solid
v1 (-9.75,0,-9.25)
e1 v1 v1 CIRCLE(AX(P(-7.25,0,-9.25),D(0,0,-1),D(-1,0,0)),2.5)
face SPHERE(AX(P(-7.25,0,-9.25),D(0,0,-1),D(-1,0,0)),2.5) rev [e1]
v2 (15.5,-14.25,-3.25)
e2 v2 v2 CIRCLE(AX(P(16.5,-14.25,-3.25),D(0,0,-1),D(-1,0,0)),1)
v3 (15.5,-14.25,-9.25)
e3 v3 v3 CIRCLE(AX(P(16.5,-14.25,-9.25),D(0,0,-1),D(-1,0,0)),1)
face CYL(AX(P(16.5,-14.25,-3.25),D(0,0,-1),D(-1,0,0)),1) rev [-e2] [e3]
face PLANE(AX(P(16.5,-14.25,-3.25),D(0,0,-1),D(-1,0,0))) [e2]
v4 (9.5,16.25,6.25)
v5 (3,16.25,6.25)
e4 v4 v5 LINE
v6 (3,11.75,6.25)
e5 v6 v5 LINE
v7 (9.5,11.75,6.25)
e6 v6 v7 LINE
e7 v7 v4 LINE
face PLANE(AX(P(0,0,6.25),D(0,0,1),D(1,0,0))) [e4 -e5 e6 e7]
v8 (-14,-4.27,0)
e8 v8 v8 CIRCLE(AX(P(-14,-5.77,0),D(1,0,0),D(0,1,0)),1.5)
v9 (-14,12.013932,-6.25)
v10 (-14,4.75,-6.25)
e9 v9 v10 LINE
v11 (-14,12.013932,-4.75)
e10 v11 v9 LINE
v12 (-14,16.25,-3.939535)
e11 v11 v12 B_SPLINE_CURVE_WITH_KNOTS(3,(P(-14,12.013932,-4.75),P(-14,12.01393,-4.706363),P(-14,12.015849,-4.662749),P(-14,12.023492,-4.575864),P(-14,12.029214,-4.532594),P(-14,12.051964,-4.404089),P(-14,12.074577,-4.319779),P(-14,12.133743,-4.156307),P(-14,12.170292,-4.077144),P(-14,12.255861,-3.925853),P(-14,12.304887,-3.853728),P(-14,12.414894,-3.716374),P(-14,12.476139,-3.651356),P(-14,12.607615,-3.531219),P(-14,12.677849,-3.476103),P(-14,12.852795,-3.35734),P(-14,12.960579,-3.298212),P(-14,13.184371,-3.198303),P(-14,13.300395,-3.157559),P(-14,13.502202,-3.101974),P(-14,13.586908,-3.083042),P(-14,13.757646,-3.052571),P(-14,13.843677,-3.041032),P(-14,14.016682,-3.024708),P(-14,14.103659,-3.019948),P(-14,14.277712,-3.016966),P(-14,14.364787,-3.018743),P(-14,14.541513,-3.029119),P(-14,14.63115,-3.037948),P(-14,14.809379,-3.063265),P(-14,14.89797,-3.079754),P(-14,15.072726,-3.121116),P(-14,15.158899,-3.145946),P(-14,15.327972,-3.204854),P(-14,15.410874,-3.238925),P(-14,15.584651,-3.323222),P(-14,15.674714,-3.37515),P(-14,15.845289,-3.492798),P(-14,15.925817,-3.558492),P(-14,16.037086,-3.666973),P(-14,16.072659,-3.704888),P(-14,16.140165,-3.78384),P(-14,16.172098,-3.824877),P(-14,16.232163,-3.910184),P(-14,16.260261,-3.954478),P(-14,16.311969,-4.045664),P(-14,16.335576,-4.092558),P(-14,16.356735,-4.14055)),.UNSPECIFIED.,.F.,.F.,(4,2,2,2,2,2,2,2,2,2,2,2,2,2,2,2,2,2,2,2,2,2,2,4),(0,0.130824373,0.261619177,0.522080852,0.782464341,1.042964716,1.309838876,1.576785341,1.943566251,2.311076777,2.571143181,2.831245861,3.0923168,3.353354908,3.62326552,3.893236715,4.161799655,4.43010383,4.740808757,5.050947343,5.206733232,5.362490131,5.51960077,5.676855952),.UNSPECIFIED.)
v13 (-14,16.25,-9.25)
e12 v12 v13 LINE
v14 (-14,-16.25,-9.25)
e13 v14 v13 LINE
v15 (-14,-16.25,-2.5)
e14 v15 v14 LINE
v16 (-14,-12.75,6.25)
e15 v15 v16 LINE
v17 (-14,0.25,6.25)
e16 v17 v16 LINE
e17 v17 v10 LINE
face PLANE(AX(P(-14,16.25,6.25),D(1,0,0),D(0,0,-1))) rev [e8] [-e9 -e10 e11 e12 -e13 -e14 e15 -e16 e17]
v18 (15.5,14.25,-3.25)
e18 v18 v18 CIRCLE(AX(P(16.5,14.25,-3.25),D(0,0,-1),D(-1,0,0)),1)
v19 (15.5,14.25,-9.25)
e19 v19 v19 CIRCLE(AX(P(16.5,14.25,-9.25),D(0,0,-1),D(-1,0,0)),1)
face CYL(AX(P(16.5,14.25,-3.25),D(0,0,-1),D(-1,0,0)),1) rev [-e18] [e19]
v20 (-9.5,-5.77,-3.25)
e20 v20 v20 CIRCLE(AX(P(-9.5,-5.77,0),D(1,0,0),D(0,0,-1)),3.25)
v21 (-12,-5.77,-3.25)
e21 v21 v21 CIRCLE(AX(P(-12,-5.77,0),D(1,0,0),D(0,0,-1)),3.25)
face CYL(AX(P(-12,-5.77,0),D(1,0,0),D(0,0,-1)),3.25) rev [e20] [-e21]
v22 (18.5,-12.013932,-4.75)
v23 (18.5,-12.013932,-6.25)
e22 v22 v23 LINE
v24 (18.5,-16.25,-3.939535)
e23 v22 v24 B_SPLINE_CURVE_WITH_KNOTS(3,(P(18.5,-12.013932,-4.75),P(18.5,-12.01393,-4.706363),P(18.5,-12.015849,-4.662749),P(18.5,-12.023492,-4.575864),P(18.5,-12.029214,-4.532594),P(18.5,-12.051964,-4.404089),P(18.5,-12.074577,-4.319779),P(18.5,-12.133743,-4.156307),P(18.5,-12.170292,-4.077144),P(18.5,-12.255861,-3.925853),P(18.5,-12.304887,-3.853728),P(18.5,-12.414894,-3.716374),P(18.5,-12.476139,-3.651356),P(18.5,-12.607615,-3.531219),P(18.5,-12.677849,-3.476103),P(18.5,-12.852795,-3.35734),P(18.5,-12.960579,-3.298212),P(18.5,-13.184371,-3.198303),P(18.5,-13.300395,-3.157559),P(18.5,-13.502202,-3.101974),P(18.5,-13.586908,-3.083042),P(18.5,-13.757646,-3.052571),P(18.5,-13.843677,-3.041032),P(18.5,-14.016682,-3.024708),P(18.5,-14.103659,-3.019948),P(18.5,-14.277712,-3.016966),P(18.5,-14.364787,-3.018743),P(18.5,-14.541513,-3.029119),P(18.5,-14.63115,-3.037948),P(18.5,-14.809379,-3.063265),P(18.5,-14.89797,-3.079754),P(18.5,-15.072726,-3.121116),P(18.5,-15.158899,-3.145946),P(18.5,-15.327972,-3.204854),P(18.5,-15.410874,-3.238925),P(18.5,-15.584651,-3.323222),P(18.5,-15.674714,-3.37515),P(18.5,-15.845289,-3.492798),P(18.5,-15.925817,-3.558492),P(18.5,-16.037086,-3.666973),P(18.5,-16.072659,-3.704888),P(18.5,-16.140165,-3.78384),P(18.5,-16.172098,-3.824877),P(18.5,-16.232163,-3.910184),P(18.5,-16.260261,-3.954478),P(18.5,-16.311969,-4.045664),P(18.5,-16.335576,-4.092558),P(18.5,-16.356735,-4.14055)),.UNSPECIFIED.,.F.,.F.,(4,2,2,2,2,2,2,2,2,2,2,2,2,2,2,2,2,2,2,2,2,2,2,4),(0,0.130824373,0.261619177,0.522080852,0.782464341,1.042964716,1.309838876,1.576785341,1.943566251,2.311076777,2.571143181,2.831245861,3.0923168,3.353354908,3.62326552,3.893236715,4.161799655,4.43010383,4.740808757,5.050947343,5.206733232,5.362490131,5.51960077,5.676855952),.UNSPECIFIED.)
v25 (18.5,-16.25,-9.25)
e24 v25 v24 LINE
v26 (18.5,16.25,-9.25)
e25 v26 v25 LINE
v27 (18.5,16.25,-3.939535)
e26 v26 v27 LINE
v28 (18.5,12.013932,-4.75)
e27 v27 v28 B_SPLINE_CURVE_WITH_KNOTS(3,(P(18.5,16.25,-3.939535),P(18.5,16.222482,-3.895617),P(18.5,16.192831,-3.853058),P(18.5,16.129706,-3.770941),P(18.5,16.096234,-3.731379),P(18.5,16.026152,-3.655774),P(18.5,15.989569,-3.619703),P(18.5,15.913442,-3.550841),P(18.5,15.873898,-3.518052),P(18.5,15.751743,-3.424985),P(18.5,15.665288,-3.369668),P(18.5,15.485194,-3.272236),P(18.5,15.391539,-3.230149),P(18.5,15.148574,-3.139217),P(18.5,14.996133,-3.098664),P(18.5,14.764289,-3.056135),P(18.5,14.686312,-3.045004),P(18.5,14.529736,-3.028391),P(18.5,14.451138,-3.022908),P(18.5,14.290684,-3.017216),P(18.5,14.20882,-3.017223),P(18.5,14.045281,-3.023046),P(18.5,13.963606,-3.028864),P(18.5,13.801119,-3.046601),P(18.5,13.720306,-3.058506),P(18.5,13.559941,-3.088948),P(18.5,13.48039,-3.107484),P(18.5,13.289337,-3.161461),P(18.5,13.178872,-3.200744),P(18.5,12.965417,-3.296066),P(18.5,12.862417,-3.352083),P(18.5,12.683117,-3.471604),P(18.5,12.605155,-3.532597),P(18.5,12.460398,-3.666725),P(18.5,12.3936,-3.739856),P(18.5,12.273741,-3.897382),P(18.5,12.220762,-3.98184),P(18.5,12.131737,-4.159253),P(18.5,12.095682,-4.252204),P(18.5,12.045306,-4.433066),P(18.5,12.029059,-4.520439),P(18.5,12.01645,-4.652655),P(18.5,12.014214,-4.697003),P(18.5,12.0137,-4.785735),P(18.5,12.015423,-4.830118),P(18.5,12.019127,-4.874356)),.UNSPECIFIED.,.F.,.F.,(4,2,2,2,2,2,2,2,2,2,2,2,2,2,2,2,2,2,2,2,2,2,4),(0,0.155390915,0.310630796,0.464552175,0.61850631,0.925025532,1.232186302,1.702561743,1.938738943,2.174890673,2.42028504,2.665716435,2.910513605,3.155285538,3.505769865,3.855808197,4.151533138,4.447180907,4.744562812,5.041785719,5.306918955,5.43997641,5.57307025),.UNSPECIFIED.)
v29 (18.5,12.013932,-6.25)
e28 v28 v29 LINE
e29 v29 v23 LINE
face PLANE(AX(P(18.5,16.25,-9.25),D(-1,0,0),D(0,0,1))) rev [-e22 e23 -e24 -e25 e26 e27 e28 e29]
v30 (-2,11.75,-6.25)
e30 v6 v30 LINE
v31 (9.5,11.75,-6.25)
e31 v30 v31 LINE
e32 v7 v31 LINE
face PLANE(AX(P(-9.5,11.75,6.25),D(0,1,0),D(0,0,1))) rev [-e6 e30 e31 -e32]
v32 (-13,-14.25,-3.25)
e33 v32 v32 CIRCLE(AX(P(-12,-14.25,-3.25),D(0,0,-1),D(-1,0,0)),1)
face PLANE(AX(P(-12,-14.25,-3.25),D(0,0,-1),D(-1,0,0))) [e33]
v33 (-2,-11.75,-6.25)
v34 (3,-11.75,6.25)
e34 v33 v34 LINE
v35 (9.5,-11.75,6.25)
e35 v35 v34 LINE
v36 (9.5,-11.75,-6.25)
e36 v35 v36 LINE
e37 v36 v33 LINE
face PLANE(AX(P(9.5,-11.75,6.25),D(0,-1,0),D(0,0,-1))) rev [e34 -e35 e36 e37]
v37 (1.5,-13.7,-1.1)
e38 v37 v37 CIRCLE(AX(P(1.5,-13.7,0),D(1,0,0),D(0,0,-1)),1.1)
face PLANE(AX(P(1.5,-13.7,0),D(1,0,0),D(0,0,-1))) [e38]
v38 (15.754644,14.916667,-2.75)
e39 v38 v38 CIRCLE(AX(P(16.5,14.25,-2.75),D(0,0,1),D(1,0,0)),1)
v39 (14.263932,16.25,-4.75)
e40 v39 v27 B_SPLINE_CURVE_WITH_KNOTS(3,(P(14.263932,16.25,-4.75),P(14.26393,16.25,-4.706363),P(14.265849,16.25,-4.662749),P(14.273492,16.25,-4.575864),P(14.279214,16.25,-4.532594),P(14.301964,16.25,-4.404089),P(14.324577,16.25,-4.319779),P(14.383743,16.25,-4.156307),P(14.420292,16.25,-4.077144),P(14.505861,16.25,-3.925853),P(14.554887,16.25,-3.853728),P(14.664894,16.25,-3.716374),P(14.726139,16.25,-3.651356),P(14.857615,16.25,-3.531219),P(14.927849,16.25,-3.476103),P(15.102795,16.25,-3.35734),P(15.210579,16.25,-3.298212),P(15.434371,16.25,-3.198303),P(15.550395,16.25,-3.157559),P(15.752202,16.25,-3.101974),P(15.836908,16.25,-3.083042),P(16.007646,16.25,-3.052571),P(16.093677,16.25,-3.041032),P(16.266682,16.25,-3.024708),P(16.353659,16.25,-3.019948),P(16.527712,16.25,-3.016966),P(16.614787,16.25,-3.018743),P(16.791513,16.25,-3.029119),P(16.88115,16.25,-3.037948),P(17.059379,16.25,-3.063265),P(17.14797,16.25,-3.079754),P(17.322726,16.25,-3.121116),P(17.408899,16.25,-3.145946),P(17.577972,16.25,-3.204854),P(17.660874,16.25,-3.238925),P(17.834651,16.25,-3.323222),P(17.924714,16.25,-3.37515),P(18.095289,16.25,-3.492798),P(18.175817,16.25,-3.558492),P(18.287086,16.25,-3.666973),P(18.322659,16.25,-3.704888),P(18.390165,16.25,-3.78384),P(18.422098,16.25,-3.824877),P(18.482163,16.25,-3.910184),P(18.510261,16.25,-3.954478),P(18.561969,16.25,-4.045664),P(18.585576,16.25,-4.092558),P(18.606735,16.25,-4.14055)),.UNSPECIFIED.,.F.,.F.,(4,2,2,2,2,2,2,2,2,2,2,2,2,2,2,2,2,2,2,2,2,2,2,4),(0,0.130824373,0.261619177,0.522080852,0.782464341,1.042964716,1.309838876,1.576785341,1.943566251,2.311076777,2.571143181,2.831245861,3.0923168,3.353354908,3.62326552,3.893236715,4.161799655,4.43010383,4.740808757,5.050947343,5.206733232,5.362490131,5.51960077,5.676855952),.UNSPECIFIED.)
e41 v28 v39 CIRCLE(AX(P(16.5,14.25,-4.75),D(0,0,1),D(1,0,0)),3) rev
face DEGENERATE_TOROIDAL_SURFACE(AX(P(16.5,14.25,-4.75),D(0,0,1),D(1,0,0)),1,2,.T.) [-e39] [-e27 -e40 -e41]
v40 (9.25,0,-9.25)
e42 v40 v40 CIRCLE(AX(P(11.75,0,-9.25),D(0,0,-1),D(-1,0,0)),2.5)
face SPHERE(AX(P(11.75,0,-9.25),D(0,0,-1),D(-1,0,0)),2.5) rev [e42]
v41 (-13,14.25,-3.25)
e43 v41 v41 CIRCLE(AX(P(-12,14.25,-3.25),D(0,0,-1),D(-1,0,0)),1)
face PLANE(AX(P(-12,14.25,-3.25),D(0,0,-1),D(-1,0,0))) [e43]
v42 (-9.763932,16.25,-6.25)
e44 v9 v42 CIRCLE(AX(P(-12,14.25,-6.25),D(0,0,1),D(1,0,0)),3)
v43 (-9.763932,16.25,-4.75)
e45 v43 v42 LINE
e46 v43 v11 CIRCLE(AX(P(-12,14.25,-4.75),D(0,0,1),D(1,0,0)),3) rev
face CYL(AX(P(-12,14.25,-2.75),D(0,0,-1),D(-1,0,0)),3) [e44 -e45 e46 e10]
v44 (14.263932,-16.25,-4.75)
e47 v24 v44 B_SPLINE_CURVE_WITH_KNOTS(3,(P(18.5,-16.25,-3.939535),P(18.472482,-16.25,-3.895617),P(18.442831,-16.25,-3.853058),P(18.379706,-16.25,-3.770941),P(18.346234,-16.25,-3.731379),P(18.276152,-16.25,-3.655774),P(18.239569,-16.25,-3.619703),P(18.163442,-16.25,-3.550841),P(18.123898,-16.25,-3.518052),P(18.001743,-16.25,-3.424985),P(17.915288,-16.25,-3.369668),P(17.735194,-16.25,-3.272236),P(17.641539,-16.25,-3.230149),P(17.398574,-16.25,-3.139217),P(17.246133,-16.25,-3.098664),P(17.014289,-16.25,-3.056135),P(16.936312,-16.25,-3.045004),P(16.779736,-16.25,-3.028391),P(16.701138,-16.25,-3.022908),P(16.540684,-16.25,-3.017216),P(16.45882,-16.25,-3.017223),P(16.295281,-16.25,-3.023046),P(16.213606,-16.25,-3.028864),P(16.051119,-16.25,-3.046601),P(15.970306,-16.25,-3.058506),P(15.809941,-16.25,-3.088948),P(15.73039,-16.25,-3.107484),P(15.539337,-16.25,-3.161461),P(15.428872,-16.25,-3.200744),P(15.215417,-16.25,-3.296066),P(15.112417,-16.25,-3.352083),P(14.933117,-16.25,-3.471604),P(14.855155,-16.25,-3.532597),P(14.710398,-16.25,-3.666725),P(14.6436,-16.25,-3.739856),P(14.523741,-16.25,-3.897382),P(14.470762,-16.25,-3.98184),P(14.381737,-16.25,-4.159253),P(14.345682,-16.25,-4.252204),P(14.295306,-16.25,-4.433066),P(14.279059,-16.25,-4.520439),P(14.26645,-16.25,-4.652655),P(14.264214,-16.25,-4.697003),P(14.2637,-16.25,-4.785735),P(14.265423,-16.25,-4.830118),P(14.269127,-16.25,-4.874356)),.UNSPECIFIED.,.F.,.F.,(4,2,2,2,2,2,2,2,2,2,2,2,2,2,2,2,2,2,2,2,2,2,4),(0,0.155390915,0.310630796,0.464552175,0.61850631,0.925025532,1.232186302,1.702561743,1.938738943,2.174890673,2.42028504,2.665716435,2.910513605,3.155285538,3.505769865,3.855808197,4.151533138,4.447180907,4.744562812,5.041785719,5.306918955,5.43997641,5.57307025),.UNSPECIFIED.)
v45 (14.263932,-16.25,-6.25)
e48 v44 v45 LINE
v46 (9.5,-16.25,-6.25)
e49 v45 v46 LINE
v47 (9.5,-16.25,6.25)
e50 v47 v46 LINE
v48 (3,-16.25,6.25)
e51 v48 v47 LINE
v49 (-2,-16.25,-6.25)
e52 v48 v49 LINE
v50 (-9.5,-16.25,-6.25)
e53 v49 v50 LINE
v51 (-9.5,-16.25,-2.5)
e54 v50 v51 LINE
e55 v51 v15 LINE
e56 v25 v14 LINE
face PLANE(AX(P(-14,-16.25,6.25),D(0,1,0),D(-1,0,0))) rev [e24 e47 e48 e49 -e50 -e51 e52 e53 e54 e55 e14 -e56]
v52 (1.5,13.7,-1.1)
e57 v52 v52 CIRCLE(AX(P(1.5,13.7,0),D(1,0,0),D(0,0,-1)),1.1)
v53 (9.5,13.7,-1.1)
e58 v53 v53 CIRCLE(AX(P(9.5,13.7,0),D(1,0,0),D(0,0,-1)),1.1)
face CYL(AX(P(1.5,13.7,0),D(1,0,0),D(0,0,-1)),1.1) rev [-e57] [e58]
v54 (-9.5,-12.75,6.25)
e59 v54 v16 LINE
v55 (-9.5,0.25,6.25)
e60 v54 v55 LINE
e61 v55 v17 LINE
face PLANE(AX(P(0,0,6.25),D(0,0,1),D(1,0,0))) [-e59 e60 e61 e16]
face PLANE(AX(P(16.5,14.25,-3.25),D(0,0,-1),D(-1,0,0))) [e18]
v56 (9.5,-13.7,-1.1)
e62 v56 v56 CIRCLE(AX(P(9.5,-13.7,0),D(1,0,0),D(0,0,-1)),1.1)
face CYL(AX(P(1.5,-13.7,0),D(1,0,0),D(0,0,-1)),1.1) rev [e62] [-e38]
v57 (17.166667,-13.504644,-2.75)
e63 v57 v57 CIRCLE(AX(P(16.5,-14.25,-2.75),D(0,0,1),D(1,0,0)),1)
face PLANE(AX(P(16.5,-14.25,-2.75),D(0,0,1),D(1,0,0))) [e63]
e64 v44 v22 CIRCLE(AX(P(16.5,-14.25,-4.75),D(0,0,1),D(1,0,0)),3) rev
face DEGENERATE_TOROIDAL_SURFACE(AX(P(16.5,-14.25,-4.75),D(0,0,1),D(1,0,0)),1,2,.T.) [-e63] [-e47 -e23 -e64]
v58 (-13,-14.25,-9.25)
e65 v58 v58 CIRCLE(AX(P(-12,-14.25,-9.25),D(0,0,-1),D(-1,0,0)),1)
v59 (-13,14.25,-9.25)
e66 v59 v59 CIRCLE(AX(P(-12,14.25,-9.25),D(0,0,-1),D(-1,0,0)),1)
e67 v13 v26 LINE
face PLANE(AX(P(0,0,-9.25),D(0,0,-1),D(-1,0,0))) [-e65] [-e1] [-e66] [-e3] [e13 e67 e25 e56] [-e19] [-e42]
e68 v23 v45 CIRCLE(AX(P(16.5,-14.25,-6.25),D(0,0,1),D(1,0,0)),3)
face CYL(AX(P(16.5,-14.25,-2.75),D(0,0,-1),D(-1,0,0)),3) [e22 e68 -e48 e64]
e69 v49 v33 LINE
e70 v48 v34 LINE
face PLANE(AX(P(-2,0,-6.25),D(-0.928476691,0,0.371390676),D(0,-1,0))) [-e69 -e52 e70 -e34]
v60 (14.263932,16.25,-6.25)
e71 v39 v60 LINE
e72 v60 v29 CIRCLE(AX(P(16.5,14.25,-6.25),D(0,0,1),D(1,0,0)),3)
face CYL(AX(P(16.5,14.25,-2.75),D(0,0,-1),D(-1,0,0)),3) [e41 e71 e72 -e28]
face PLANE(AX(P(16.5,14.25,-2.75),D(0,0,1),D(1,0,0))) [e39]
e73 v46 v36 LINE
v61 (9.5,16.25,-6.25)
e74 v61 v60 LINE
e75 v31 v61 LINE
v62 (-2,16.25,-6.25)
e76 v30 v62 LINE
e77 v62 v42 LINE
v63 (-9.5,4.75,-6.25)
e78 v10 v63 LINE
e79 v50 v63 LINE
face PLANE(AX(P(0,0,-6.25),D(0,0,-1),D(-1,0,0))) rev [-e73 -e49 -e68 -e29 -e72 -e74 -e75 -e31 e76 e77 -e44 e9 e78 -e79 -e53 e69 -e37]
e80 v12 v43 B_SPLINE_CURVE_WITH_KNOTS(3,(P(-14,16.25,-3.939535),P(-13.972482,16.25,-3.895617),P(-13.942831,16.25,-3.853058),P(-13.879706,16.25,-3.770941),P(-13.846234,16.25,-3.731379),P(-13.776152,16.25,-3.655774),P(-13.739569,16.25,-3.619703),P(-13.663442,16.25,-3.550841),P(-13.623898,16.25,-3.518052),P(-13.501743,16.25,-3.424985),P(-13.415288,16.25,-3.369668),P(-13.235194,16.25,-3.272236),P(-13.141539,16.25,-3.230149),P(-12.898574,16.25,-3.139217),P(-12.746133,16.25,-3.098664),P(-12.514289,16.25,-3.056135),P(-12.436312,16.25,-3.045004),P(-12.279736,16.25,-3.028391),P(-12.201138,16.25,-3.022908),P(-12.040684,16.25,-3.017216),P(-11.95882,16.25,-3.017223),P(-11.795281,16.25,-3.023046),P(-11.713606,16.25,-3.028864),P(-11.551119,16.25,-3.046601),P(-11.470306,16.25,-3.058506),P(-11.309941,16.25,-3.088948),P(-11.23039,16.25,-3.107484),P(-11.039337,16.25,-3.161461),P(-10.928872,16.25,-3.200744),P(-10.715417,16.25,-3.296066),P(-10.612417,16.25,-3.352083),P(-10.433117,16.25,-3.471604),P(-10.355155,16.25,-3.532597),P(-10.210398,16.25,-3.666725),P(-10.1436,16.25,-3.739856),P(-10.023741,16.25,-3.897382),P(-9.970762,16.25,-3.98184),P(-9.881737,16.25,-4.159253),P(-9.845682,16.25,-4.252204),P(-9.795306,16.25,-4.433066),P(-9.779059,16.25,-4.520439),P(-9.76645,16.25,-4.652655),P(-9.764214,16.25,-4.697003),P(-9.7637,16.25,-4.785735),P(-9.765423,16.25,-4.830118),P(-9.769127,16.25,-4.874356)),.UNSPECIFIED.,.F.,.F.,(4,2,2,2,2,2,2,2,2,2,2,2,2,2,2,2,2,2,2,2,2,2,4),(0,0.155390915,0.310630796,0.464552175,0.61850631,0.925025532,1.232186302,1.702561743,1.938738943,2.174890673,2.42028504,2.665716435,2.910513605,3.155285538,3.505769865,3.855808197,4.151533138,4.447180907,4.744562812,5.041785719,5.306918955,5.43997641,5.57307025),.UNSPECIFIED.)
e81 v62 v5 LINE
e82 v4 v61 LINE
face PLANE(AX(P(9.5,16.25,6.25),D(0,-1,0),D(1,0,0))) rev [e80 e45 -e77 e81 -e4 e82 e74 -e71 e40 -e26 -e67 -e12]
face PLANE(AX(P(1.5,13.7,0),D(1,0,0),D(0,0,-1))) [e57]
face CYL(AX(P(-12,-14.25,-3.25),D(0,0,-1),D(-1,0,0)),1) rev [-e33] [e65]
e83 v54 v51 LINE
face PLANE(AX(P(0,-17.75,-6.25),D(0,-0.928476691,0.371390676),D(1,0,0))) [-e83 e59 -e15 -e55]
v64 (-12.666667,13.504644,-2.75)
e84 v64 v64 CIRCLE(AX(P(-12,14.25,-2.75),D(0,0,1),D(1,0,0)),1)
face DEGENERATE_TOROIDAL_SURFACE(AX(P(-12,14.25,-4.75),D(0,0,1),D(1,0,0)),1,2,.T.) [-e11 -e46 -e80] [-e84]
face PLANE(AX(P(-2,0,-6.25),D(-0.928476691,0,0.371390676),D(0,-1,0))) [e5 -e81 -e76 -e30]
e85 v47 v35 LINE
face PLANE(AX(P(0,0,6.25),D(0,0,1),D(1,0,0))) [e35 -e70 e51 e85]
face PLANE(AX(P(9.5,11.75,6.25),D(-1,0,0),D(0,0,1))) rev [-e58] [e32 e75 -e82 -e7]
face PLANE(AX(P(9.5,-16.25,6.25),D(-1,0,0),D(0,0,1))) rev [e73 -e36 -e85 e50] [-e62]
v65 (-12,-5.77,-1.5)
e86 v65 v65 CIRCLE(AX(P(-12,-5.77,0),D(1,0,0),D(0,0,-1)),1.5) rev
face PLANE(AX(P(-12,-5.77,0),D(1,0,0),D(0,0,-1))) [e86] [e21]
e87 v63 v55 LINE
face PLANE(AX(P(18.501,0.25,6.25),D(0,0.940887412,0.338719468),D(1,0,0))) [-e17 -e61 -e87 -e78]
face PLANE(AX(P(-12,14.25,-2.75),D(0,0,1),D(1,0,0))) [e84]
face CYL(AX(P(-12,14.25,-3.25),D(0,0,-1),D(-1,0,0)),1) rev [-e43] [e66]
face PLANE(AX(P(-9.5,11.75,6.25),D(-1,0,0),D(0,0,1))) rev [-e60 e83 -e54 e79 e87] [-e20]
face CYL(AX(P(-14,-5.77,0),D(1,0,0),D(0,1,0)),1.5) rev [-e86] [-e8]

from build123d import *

# Parameters (mm, degrees)
EXTRUDE_640_DEPTH      = 6.25
SKETCH_5_W             = 2.5
SKETCH_5_H             = 8
CUT_EXTRUDE_957_DEPTH  = 4.5
SKETCH_1_W             = 32.5
SKETCH_1_H             = 32.5
EXTRUDE_1522_DEPTH     = 3
SKETCH_4_R             = 1.5
CUT_EXTRUDE_1878_DEPTH = 34.669348078
SKETCH_9_R             = 2.5
CUT_EXTRUDE_4358_DEPTH = 2.5
FILLET_3_R             = 2.5
SKETCH_10_W            = 12.5
SKETCH_10_H            = 12.5
CUT_EXTRUDE_4764_DEPTH = 39.52353177
CUT_EXTRUDE_5191_REACH = 39.495
SKETCH_13_W            = 12.5
SKETCH_13_H            = 16
SKETCH_13_H_2          = 3.5
CHAMFER_3_SIZE         = 5
CHAMFER_3_SIZE_2       = 12.5
SKETCH_5338_R          = 1.1
CUT_EXTRUDE_5550_DEPTH = 8
CHAMFER_START          = -14
CHAMFER_4_DEPTH        = 4.5
EXTRUDE_6314_DEPTH     = 3.5
SKETCH_15_R            = 1
CUT_EXTRUDE_6618_DEPTH = 6
SKETCH_17_R            = 3.25
CUT_EXTRUDE_7180_DEPTH = 2.5


with BuildPart() as part:
    # Эскиз2 → Extrude 640 (new, symmetric)
    with BuildSketch(Plane.XY):
        Polygon((9.5, 16.25), (-14, 16.25), (-14, -16.25), (9.5, -16.25), (9.5, -11.75), (-9.5, -11.75), (-9.5, 11.75), (9.5, 11.75), align=None)
    extrude(amount=EXTRUDE_640_DEPTH, both=True)

    # Эскиз5 → Cut-Extrude 957 (cut)
    with BuildSketch(Plane.XZ.offset(11.75)):
        with Locations((-4.2, 2.25)):
            Rectangle(SKETCH_5_W, SKETCH_5_H)
    extrude(amount=CUT_EXTRUDE_957_DEPTH, mode=Mode.SUBTRACT)

    # Эскиз1 → Extrude 1522 (add)
    with BuildSketch(Plane(origin=(0, 0, -6.25), x_dir=(-1, 0, 0), z_dir=(0, 0, -1))):
        with Locations((-2.25, 0)):
            Rectangle(SKETCH_1_W, SKETCH_1_H)
    extrude(amount=EXTRUDE_1522_DEPTH)

    # Эскиз4 → Cut-Extrude 1878 (cut, through all)
    with BuildSketch(Plane(origin=(-9.5, 0, 0), x_dir=(0, 0, -1), z_dir=(1, 0, 0))):
        with Locations(Location((0, -5.77, 0), (0, 0, 90))):
            Circle(SKETCH_4_R)
    extrude(amount=-CUT_EXTRUDE_1878_DEPTH, mode=Mode.SUBTRACT)

    # Эскиз9 → Cut-Extrude 4358 (cut)
    with BuildSketch(Plane(origin=(0, 0, -9.25), x_dir=(-1, 0, 0), z_dir=(0, 0, -1))):
        with Locations((-11.75, 0)):
            Circle(SKETCH_9_R)
        with Locations((7.25, 0)):
            Circle(SKETCH_9_R)
    extrude(amount=-CUT_EXTRUDE_4358_DEPTH, mode=Mode.SUBTRACT)

    # Скругление3
    fillet_3_edges = [part.edges().sort_by_distance(p)[0] for p in [
        (14.25, 0, -6.75),
        (-4.75, 0, -6.75),
    ]]
    fillet(fillet_3_edges, radius=FILLET_3_R - 0.0001)  # a hair under: the kernel refuses the full size

    # Эскиз10 → Cut-Extrude 4764 (cut, through all)
    with BuildSketch(Plane(origin=(0, 16.25, 0), x_dir=(1, 0, 0), z_dir=(0, 1, 0))):
        with Locations((-3.25, 0)):
            Rectangle(SKETCH_10_W, SKETCH_10_H)
    extrude(amount=-CUT_EXTRUDE_4764_DEPTH, mode=Mode.SUBTRACT)

    # Эскиз13 → Cut-Extrude 5191 (cut, up to next)
    with BuildSketch(Plane.ZY.offset(14), mode=Mode.PRIVATE) as cut_extrude_5191_sk1:
        with Locations((0, 8.25)):
            Rectangle(SKETCH_13_W, SKETCH_13_H)
    cut_extrude_5191_tool1 = extrude(cut_extrude_5191_sk1.sketch, amount=-CUT_EXTRUDE_5191_REACH, mode=Mode.PRIVATE) & part.part
    # Эскиз13 → Cut-Extrude 5191 (cut, up to next)
    with BuildSketch(Plane.ZY.offset(14), mode=Mode.PRIVATE) as cut_extrude_5191_sk2:
        with Locations((0, -14.5)):
            Rectangle(SKETCH_13_W, SKETCH_13_H_2)
    cut_extrude_5191_tool2 = extrude(cut_extrude_5191_sk2.sketch, amount=-CUT_EXTRUDE_5191_REACH, mode=Mode.PRIVATE) & part.part
    add(cut_extrude_5191_tool1.solids().sort_by_distance((-14, 8.25, 0))[0], mode=Mode.SUBTRACT)
    add(cut_extrude_5191_tool2.solids().sort_by_distance((-14, -14.5, 0))[0], mode=Mode.SUBTRACT)

    # Фаска3
    # the kernel refuses this chamfer: 12.5, 5 mm, written as the material it adds along each edge
    with BuildSketch(Plane(origin=(3, 16.25, -6.25), x_dir=(-1, 0, 0), z_dir=(0, -1, 0))) as chamfer_3_piece_1:
        Polygon((CHAMFER_3_SIZE, 0), (0, -CHAMFER_3_SIZE_2), (0, 0), align=None)
    extrude(amount=4.5)
    with BuildSketch(Plane(origin=(3, 48.663920489, -6.25), x_dir=(-1, 0, 0), z_dir=(0, -1, 0))) as chamfer_3_piece_2_section:
        Polygon((CHAMFER_3_SIZE, 0), (0, -CHAMFER_3_SIZE_2), (0, 0), align=None)
    chamfer_3_piece_2 = extrude(amount=69.327840978, mode=Mode.PRIVATE)
    chamfer_3_piece_2 = split(chamfer_3_piece_2, bisect_by=Plane(origin=(3, -16.25, -6.25), z_dir=(0, 1, 0)), keep=Keep.TOP, mode=Mode.PRIVATE)
    chamfer_3_piece_2 = split(chamfer_3_piece_2, bisect_by=Plane(origin=(3, -11.75, -6.25), z_dir=(0, -1, 0)), keep=Keep.TOP, mode=Mode.PRIVATE)
    add(chamfer_3_piece_2)
    with BuildSketch(Plane(origin=(3, 20.663920489, -6.25), x_dir=(0, 0, 1), z_dir=(0, -1, 0))) as chamfer_3_piece_3_section:
        Polygon((CHAMFER_3_SIZE_2, 0), (0, CHAMFER_3_SIZE), (0, 0), align=None)
    chamfer_3_piece_3 = extrude(amount=69.327840978, mode=Mode.PRIVATE)
    chamfer_3_piece_3 = split(chamfer_3_piece_3, bisect_by=Plane(origin=(3, 11.75, -6.25), z_dir=(0, 1, 0)), keep=Keep.TOP, mode=Mode.PRIVATE)
    chamfer_3_piece_3 = split(chamfer_3_piece_3, bisect_by=Plane(origin=(3, 16.25, -6.25), z_dir=(0, -1, 0)), keep=Keep.TOP, mode=Mode.PRIVATE)
    add(chamfer_3_piece_3)
    with BuildSketch(Plane(origin=(3, -11.75, -6.25), x_dir=(0, 0, 1), z_dir=(0, -1, 0))) as chamfer_3_piece_4:
        Polygon((CHAMFER_3_SIZE_2, 0), (0, CHAMFER_3_SIZE), (0, 0), align=None)
    extrude(amount=4.5)
    with BuildSketch(Plane(origin=(-14, -12.75, -6.25), x_dir=(0, -1, 0), z_dir=(1, 0, 0))) as chamfer_3_piece_5_section:
        Polygon((CHAMFER_3_SIZE, 0), (0, -CHAMFER_3_SIZE_2), (0, 0), align=None)
    chamfer_3_piece_5 = extrude(amount=4.5, mode=Mode.PRIVATE)
    chamfer_3_piece_5 = split(chamfer_3_piece_5, bisect_by=Plane(origin=(-14, -16.25, -6.25), z_dir=(0, 1, 0)), keep=Keep.TOP, mode=Mode.PRIVATE)
    add(chamfer_3_piece_5)

    # Sketch 5338 → Cut-Extrude 5550 (cut)
    with BuildSketch(Plane(origin=(9.5, 0, 0), x_dir=(0, 0, -1), z_dir=(1, 0, 0))):
        with Locations((0, 13.7)):
            Circle(SKETCH_5338_R)
        with Locations((0, -13.7)):
            Circle(SKETCH_5338_R)
    extrude(amount=-CUT_EXTRUDE_5550_DEPTH, mode=Mode.SUBTRACT)

    # Фаска4: read off the stored shape, not the designer's step
    # Фаска4 outline → Фаска4 (add)
    with BuildSketch(Plane.YZ.offset(CHAMFER_START)):
        Polygon((0.25, -6.25), (4.75, -6.25), (0.25, 6.25), align=None)
    extrude(amount=CHAMFER_4_DEPTH)

    # Эскиз16 → Extrude 6314 (add)
    with BuildSketch(Plane.XY.offset(-6.25)):
        with BuildLine():
            Line((-14, 12.013932023), (-14, 16.25))
            Line((-14, 16.25), (-9.763932023, 16.25))
            ThreePointArc((-9.763932023, 16.25), (-9.878679656, 12.128679656), (-14, 12.013932023))
        make_face()
        with BuildLine():
            Line((14.263932023, 16.25), (18.5, 16.25))
            Line((18.5, 16.25), (18.5, 12.013932023))
            ThreePointArc((18.5, 12.013932023), (14.378679656, 12.128679656), (14.263932023, 16.25))
        make_face()
        with BuildLine():
            Line((18.5, -12.013932023), (18.5, -16.25))
            Line((18.5, -16.25), (14.263932023, -16.25))
            ThreePointArc((14.263932023, -16.25), (14.378679656, -12.128679656), (18.5, -12.013932023))
        make_face()
    extrude(amount=EXTRUDE_6314_DEPTH)

    # Эскиз15 → Cut-Extrude 6618 (cut)
    with BuildSketch(Plane(origin=(0, 0, -9.25), x_dir=(-1, 0, 0), z_dir=(0, 0, -1))):
        with Locations((12, -14.25)):
            Circle(SKETCH_15_R)
        with Locations((12, 14.25)):
            Circle(SKETCH_15_R)
        with Locations((-16.5, 14.25)):
            Circle(SKETCH_15_R)
        with Locations((-16.5, -14.25)):
            Circle(SKETCH_15_R)
    extrude(amount=-CUT_EXTRUDE_6618_DEPTH, mode=Mode.SUBTRACT)

    # Скругление4: read off the stored shape, not the designer's step
    # Скругление4 outline → Скругление4 (revolve, cut)
    with BuildSketch(Plane(origin=(16.5, 14.25, 0), x_dir=(1, 0, 0), z_dir=(0, -1, 0))):
        with BuildLine():
            ThreePointArc((1, -2.75), (2.414213562, -3.335786438), (3, -4.75))
            Line((3, -4.75), (3, -2.75))
            Line((3, -2.75), (1, -2.75))
        make_face()
    revolve(axis=Axis((16.5, 14.25, 0), (0, 0, 1)), mode=Mode.SUBTRACT)

    # Fillet 4 2 outline → Fillet 4 2 (revolve, cut)
    with BuildSketch(Plane(origin=(-12, 14.25, 0), x_dir=(1, 0, 0), z_dir=(0, -1, 0))):
        with BuildLine():
            ThreePointArc((1, -2.75), (2.414213562, -3.335786438), (3, -4.75))
            Line((3, -4.75), (3, -2.75))
            Line((3, -2.75), (1, -2.75))
        make_face()
    revolve(axis=Axis((-12, 14.25, 0), (0, 0, 1)), mode=Mode.SUBTRACT)

    # Fillet 4 3 outline → Fillet 4 3 (revolve, cut)
    with BuildSketch(Plane(origin=(16.5, -14.25, 0), x_dir=(1, 0, 0), z_dir=(0, -1, 0))):
        with BuildLine():
            ThreePointArc((1, -2.75), (2.414213562, -3.335786438), (3, -4.75))
            Line((3, -4.75), (3, -2.75))
            Line((3, -2.75), (1, -2.75))
        make_face()
    revolve(axis=Axis((16.5, -14.25, 0), (0, 0, 1)), mode=Mode.SUBTRACT)

    # Эскиз17 → Cut-Extrude 7180 (cut)
    with BuildSketch(Plane(origin=(-9.5, 0, 0), x_dir=(0, 0, -1), z_dir=(1, 0, 0))):
        with Locations((0, -5.77)):
            Circle(SKETCH_17_R)
    extrude(amount=-CUT_EXTRUDE_7180_DEPTH, mode=Mode.SUBTRACT)


solid = part.part
